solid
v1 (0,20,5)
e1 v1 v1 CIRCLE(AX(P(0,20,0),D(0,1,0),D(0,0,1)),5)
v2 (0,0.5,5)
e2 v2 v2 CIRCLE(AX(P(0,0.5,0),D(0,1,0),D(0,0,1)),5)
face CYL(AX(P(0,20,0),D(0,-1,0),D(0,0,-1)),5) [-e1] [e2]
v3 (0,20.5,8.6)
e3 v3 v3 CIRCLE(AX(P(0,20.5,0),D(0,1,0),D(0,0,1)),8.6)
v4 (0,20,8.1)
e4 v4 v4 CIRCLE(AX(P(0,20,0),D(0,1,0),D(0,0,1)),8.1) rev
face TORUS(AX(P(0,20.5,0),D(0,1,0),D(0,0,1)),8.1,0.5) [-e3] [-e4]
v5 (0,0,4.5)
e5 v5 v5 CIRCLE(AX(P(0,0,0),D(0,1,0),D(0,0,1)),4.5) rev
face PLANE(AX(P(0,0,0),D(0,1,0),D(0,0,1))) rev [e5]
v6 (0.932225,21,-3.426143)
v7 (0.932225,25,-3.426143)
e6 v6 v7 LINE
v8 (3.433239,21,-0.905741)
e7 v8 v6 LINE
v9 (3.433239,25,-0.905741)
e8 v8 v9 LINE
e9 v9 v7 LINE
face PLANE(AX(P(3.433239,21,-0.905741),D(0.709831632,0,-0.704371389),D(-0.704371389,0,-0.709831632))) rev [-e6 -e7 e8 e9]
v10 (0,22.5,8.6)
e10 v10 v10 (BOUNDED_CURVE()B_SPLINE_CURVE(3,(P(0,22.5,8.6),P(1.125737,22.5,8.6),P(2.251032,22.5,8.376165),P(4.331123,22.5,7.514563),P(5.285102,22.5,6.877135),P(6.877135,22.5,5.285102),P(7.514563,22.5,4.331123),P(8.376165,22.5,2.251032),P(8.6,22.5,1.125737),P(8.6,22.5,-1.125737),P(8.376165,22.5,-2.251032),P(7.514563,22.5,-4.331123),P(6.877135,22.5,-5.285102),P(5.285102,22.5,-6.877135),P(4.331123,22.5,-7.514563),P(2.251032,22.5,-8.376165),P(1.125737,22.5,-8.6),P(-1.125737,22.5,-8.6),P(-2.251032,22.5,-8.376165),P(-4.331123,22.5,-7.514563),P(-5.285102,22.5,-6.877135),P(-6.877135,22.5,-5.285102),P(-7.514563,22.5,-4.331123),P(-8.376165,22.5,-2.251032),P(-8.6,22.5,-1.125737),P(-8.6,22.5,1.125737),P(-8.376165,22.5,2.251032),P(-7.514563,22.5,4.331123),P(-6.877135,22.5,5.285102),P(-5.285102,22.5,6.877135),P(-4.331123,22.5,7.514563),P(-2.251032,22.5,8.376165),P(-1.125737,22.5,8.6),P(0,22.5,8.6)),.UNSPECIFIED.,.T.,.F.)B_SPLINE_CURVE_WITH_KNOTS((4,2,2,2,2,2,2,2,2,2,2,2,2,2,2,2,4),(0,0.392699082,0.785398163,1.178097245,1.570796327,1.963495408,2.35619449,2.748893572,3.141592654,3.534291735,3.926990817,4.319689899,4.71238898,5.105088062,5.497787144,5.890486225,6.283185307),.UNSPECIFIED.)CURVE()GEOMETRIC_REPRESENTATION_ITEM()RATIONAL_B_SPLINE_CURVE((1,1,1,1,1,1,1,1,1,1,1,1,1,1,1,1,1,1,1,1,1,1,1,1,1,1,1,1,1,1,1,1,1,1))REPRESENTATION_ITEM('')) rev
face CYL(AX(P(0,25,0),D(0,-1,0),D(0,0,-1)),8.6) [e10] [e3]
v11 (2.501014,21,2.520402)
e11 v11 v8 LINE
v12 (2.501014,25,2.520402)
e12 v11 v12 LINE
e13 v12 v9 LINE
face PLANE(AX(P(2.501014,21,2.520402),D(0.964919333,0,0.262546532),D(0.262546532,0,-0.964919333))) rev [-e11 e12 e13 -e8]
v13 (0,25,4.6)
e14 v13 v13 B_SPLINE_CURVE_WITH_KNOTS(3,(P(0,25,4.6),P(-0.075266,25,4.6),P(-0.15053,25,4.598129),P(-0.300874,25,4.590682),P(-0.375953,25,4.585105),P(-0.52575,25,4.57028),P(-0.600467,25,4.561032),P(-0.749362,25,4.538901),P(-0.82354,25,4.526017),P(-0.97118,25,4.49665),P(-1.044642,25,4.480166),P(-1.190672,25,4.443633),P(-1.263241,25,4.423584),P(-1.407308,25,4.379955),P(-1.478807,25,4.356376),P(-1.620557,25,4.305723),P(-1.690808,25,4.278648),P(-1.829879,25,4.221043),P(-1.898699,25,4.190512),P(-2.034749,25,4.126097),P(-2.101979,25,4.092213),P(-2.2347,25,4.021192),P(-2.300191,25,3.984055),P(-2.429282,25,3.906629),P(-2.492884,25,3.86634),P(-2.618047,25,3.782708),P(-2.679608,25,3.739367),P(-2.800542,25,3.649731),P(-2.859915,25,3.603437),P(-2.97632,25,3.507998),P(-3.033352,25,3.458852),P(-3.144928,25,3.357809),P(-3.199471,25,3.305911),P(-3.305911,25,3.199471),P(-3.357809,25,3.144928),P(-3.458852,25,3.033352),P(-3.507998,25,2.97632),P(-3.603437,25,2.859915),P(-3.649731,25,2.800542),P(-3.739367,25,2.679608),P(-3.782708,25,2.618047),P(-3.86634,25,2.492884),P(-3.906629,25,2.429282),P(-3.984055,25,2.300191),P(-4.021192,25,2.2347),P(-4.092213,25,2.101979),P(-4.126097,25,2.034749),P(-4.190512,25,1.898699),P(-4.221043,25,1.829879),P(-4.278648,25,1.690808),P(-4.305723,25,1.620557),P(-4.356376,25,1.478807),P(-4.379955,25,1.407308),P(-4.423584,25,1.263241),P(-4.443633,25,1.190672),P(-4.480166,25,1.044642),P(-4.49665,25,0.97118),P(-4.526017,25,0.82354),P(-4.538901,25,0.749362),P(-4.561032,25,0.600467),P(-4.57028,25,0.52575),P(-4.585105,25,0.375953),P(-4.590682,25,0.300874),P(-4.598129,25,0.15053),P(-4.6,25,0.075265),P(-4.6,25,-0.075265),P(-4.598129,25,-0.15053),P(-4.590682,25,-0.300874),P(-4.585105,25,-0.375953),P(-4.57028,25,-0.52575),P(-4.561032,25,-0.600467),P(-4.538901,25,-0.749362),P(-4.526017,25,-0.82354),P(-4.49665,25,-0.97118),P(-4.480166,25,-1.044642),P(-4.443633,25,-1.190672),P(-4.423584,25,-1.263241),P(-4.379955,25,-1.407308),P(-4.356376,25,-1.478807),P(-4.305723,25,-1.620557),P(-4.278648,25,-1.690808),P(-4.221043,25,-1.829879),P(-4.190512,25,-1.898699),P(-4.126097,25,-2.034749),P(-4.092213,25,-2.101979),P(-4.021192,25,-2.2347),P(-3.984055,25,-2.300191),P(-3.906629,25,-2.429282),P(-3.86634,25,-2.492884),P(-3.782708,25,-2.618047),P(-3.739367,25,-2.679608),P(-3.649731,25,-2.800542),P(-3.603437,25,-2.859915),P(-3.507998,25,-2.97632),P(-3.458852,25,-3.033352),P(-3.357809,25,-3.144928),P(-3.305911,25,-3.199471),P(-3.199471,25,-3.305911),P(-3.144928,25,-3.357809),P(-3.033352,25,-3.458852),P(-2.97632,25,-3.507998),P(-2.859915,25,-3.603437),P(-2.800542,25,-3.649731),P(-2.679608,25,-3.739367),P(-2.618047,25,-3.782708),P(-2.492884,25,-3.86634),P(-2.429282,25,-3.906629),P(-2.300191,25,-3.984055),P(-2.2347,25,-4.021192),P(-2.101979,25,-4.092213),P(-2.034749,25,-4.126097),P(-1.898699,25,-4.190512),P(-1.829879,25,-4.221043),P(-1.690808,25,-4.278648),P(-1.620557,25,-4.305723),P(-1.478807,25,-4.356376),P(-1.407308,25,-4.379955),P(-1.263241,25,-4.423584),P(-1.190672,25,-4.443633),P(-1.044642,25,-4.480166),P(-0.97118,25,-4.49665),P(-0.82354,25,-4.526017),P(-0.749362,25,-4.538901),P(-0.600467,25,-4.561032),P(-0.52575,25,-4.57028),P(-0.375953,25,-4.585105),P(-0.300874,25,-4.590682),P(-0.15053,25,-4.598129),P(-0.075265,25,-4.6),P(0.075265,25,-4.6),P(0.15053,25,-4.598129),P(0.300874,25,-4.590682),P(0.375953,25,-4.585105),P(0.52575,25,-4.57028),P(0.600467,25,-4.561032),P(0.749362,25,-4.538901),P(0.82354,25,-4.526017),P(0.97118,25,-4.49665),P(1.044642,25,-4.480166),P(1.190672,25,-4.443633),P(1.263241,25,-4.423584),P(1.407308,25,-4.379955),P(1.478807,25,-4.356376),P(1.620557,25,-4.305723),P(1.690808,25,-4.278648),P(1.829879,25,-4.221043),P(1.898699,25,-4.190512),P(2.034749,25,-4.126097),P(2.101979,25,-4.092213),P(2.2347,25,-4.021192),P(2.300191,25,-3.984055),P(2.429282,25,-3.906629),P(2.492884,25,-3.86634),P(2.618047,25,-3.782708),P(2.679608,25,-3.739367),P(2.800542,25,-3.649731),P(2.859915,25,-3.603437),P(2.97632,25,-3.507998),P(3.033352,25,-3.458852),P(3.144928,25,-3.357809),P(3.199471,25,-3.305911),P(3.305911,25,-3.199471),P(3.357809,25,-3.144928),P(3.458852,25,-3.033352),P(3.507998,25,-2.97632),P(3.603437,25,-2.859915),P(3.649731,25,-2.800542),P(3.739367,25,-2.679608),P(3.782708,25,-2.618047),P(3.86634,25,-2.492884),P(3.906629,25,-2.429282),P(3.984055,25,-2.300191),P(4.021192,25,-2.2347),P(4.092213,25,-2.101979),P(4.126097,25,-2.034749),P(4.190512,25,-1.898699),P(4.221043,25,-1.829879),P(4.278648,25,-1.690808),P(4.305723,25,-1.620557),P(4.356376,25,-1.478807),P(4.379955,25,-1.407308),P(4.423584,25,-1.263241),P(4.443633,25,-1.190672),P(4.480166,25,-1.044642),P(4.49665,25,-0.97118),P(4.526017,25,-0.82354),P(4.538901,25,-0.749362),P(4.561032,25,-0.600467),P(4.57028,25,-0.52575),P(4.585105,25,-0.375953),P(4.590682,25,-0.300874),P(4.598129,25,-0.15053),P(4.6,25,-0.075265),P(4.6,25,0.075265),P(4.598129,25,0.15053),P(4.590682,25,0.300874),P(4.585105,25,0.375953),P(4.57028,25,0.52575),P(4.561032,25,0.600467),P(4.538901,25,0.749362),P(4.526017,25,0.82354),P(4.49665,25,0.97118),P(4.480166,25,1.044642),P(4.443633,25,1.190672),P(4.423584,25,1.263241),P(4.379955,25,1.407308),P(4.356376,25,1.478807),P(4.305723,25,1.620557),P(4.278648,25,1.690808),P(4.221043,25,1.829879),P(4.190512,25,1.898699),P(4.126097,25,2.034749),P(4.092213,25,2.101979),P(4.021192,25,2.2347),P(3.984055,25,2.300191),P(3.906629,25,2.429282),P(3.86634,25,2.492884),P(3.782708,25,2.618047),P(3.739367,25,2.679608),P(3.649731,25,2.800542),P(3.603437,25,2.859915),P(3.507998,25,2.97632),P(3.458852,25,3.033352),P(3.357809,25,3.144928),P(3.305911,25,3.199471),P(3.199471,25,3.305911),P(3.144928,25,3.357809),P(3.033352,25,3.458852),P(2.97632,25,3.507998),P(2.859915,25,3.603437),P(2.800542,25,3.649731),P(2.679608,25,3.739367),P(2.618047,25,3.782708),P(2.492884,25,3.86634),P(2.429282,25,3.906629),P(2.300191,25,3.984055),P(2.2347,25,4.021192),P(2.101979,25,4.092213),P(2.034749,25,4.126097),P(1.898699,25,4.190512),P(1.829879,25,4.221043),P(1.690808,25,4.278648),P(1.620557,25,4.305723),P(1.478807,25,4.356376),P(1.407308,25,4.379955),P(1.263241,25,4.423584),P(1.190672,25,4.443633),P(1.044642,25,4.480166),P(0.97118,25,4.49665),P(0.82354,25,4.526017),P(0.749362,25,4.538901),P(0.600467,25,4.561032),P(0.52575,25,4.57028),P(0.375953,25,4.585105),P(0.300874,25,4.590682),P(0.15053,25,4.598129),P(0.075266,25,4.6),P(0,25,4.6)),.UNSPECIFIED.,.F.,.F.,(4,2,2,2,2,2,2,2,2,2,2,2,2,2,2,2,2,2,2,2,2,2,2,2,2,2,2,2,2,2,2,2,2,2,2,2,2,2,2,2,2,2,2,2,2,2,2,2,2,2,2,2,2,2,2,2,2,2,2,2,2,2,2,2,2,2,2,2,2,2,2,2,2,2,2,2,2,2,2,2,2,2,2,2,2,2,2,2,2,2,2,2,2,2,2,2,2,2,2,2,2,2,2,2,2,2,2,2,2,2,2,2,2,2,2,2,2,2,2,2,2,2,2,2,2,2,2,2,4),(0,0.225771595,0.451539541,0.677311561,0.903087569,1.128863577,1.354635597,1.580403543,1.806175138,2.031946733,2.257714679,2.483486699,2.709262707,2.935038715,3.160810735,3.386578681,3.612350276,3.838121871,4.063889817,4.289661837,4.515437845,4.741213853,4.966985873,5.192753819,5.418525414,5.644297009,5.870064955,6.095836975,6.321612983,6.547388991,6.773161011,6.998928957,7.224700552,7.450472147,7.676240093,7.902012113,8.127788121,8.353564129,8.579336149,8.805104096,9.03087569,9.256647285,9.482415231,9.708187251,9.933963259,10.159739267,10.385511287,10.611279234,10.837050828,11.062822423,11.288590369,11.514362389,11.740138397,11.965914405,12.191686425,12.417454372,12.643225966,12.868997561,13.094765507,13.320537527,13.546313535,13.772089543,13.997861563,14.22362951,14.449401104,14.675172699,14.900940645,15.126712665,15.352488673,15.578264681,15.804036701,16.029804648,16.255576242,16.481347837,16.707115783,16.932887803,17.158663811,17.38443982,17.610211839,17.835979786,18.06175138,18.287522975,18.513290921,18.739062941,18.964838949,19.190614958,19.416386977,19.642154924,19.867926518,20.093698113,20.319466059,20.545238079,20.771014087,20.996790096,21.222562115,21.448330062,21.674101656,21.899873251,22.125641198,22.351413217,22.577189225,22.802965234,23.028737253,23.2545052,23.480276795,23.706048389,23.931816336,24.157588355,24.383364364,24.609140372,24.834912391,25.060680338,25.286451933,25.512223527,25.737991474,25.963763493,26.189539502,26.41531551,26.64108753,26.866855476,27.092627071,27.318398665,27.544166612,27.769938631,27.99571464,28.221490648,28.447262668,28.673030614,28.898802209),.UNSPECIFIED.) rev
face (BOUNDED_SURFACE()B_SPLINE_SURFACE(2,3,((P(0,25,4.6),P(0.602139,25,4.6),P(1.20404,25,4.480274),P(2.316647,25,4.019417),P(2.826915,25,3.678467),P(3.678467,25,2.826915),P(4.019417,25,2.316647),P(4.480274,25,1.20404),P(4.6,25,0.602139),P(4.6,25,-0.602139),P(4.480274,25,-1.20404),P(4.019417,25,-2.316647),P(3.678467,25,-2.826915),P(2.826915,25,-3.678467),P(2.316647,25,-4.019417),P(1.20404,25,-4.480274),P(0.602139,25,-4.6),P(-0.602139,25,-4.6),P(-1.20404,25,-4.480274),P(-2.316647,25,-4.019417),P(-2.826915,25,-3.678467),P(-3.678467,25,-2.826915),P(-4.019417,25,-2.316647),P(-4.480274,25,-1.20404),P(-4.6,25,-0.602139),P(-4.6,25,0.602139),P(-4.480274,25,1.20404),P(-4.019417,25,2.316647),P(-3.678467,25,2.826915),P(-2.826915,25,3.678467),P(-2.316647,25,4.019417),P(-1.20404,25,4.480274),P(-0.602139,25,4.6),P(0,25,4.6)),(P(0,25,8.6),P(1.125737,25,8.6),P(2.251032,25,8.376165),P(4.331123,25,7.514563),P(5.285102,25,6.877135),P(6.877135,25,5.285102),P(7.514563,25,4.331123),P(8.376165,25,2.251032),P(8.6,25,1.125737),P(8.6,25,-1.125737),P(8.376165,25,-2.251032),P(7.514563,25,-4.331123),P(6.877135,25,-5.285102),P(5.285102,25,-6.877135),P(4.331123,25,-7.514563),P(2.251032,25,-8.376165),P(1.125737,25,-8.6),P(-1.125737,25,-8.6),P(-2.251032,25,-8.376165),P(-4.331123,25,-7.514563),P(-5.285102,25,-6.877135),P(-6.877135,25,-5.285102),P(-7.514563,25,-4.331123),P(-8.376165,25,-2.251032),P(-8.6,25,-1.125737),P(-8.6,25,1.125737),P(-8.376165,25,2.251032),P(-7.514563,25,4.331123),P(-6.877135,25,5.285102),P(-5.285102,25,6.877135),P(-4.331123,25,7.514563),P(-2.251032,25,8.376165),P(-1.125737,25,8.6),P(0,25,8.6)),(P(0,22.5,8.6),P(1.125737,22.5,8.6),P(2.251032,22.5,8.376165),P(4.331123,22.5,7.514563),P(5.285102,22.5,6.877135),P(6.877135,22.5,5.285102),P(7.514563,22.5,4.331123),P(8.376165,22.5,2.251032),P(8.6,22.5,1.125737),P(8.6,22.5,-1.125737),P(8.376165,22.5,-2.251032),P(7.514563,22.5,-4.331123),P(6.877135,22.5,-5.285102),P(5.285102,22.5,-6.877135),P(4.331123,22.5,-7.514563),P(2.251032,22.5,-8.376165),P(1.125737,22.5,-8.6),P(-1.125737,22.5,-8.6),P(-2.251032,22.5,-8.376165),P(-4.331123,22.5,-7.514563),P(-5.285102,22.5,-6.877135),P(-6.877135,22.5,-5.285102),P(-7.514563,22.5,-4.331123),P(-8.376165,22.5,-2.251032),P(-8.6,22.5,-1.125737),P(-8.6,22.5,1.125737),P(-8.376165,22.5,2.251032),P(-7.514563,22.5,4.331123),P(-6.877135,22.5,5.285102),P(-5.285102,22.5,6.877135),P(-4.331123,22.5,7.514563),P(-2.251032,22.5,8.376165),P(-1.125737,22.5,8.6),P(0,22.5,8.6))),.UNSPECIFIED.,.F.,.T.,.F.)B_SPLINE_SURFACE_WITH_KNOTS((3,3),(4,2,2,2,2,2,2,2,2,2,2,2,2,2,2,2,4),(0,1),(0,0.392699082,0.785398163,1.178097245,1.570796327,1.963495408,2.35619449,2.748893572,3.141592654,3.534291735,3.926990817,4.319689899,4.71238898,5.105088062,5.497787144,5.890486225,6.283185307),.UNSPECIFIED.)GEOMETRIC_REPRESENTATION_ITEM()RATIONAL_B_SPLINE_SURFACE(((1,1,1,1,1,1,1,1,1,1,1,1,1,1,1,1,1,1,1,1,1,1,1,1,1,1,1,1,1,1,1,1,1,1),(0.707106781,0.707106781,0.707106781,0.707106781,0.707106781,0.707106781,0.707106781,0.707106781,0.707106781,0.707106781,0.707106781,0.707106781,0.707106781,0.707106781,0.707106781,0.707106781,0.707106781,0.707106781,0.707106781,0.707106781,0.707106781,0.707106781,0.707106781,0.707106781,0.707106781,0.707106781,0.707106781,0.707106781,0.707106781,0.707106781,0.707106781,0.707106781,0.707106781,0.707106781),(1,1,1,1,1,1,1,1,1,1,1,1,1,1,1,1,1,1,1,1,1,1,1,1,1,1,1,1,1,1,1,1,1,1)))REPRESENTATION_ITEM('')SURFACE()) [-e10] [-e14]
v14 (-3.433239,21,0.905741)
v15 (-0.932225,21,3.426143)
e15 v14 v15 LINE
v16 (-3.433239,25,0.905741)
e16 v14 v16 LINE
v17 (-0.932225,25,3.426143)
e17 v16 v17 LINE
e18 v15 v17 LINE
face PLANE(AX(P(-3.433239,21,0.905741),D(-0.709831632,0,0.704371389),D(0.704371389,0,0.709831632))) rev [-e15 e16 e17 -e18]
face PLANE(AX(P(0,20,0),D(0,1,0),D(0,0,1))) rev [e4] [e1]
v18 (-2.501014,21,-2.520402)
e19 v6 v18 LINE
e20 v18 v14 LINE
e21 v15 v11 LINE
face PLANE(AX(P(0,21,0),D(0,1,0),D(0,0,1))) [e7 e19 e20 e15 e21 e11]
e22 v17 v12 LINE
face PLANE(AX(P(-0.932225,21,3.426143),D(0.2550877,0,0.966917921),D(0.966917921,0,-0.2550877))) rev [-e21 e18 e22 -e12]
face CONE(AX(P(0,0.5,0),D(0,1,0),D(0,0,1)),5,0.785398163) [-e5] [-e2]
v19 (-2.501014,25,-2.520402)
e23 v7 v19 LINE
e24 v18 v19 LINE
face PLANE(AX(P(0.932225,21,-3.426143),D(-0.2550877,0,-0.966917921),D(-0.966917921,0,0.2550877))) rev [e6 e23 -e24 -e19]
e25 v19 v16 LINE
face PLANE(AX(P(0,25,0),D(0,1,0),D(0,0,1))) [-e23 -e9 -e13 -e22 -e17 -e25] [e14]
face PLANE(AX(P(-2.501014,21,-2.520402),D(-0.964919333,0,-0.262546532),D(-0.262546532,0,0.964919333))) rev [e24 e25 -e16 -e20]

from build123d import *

# Parameters (mm, degrees)
SKETCH1_R           = 5
BOSS_EXTRUDE1_DEPTH = 20
SKETCH2_R           = 8.6
BOSS_EXTRUDE2_DEPTH = 5
FILLET1_SIZE        = 2.5
FILLET1_SIZE_2      = 4
CUT_EXTRUDE1_DEPTH  = 4
FILLET2_R           = 0.5
CHAMFER1_SIZE       = 0.5


with BuildPart() as part:
    # Sketch1 → Boss-Extrude1 (new body)
    with BuildSketch(Plane(origin=(0, 0, 0), x_dir=(1, 0, 0), z_dir=(0, 1, 0))):
        with Locations(Location((0, 0, 0), (0, 0, 270))):
            Circle(SKETCH1_R)
    extrude(amount=BOSS_EXTRUDE1_DEPTH)

    # Sketch2 → Boss-Extrude2 (add)
    with BuildSketch(Plane(origin=(0, 20, 0), x_dir=(1, 0, 0), z_dir=(0, 1, 0))):
        with Locations(Location((0, 0, 0), (0, 0, 270))):
            Circle(SKETCH2_R)
    extrude(amount=BOSS_EXTRUDE2_DEPTH)

    # Fillet1
    # an asymmetric fillet: 4, 2.5 mm, written as the material it takes off along each edge
    with BuildSketch(Plane(origin=(0, 25, 0), x_dir=(0, 0, 1), z_dir=(-1, 0, 0))) as fillet1_piece_1:
        with BuildLine():
            Bezier((8.6, -FILLET1_SIZE), (8.6, 0), (8.6 - FILLET1_SIZE_2, 0), weights=[1, 0.707106781, 1])
            Line((8.6 - FILLET1_SIZE_2, 0), (8.6, 0))
            Line((8.6, 0), (8.6, -FILLET1_SIZE))
        make_face()
    revolve(axis=Axis((0, 25, 0), (0, 1, 0)), mode=Mode.SUBTRACT)

    # Sketch3 → Cut-Extrude1 (cut)
    with BuildSketch(Plane(origin=(0, 25, 0), x_dir=(1, 0, 0), z_dir=(0, 1, 0))):
        Polygon((2.501014418, -2.520402127), (3.433239479, 0.905740958), (0.93222506, 3.426143085), (-2.501014418, 2.520402127), (-3.433239479, -0.905740958), (-0.93222506, -3.426143085), align=None)
    extrude(amount=-CUT_EXTRUDE1_DEPTH, mode=Mode.SUBTRACT)

    # Fillet2
    fillet2_edges = [part.edges().sort_by_distance(p)[0] for p in [
        (0, 20, -8.6),
    ]]
    fillet(fillet2_edges, radius=FILLET2_R)

    # Chamfer1
    chamfer1_edges = [part.edges().sort_by_distance(p)[0] for p in [
        (0, 0, -5),
    ]]
    chamfer(chamfer1_edges, length=CHAMFER1_SIZE)


solid = part.part
